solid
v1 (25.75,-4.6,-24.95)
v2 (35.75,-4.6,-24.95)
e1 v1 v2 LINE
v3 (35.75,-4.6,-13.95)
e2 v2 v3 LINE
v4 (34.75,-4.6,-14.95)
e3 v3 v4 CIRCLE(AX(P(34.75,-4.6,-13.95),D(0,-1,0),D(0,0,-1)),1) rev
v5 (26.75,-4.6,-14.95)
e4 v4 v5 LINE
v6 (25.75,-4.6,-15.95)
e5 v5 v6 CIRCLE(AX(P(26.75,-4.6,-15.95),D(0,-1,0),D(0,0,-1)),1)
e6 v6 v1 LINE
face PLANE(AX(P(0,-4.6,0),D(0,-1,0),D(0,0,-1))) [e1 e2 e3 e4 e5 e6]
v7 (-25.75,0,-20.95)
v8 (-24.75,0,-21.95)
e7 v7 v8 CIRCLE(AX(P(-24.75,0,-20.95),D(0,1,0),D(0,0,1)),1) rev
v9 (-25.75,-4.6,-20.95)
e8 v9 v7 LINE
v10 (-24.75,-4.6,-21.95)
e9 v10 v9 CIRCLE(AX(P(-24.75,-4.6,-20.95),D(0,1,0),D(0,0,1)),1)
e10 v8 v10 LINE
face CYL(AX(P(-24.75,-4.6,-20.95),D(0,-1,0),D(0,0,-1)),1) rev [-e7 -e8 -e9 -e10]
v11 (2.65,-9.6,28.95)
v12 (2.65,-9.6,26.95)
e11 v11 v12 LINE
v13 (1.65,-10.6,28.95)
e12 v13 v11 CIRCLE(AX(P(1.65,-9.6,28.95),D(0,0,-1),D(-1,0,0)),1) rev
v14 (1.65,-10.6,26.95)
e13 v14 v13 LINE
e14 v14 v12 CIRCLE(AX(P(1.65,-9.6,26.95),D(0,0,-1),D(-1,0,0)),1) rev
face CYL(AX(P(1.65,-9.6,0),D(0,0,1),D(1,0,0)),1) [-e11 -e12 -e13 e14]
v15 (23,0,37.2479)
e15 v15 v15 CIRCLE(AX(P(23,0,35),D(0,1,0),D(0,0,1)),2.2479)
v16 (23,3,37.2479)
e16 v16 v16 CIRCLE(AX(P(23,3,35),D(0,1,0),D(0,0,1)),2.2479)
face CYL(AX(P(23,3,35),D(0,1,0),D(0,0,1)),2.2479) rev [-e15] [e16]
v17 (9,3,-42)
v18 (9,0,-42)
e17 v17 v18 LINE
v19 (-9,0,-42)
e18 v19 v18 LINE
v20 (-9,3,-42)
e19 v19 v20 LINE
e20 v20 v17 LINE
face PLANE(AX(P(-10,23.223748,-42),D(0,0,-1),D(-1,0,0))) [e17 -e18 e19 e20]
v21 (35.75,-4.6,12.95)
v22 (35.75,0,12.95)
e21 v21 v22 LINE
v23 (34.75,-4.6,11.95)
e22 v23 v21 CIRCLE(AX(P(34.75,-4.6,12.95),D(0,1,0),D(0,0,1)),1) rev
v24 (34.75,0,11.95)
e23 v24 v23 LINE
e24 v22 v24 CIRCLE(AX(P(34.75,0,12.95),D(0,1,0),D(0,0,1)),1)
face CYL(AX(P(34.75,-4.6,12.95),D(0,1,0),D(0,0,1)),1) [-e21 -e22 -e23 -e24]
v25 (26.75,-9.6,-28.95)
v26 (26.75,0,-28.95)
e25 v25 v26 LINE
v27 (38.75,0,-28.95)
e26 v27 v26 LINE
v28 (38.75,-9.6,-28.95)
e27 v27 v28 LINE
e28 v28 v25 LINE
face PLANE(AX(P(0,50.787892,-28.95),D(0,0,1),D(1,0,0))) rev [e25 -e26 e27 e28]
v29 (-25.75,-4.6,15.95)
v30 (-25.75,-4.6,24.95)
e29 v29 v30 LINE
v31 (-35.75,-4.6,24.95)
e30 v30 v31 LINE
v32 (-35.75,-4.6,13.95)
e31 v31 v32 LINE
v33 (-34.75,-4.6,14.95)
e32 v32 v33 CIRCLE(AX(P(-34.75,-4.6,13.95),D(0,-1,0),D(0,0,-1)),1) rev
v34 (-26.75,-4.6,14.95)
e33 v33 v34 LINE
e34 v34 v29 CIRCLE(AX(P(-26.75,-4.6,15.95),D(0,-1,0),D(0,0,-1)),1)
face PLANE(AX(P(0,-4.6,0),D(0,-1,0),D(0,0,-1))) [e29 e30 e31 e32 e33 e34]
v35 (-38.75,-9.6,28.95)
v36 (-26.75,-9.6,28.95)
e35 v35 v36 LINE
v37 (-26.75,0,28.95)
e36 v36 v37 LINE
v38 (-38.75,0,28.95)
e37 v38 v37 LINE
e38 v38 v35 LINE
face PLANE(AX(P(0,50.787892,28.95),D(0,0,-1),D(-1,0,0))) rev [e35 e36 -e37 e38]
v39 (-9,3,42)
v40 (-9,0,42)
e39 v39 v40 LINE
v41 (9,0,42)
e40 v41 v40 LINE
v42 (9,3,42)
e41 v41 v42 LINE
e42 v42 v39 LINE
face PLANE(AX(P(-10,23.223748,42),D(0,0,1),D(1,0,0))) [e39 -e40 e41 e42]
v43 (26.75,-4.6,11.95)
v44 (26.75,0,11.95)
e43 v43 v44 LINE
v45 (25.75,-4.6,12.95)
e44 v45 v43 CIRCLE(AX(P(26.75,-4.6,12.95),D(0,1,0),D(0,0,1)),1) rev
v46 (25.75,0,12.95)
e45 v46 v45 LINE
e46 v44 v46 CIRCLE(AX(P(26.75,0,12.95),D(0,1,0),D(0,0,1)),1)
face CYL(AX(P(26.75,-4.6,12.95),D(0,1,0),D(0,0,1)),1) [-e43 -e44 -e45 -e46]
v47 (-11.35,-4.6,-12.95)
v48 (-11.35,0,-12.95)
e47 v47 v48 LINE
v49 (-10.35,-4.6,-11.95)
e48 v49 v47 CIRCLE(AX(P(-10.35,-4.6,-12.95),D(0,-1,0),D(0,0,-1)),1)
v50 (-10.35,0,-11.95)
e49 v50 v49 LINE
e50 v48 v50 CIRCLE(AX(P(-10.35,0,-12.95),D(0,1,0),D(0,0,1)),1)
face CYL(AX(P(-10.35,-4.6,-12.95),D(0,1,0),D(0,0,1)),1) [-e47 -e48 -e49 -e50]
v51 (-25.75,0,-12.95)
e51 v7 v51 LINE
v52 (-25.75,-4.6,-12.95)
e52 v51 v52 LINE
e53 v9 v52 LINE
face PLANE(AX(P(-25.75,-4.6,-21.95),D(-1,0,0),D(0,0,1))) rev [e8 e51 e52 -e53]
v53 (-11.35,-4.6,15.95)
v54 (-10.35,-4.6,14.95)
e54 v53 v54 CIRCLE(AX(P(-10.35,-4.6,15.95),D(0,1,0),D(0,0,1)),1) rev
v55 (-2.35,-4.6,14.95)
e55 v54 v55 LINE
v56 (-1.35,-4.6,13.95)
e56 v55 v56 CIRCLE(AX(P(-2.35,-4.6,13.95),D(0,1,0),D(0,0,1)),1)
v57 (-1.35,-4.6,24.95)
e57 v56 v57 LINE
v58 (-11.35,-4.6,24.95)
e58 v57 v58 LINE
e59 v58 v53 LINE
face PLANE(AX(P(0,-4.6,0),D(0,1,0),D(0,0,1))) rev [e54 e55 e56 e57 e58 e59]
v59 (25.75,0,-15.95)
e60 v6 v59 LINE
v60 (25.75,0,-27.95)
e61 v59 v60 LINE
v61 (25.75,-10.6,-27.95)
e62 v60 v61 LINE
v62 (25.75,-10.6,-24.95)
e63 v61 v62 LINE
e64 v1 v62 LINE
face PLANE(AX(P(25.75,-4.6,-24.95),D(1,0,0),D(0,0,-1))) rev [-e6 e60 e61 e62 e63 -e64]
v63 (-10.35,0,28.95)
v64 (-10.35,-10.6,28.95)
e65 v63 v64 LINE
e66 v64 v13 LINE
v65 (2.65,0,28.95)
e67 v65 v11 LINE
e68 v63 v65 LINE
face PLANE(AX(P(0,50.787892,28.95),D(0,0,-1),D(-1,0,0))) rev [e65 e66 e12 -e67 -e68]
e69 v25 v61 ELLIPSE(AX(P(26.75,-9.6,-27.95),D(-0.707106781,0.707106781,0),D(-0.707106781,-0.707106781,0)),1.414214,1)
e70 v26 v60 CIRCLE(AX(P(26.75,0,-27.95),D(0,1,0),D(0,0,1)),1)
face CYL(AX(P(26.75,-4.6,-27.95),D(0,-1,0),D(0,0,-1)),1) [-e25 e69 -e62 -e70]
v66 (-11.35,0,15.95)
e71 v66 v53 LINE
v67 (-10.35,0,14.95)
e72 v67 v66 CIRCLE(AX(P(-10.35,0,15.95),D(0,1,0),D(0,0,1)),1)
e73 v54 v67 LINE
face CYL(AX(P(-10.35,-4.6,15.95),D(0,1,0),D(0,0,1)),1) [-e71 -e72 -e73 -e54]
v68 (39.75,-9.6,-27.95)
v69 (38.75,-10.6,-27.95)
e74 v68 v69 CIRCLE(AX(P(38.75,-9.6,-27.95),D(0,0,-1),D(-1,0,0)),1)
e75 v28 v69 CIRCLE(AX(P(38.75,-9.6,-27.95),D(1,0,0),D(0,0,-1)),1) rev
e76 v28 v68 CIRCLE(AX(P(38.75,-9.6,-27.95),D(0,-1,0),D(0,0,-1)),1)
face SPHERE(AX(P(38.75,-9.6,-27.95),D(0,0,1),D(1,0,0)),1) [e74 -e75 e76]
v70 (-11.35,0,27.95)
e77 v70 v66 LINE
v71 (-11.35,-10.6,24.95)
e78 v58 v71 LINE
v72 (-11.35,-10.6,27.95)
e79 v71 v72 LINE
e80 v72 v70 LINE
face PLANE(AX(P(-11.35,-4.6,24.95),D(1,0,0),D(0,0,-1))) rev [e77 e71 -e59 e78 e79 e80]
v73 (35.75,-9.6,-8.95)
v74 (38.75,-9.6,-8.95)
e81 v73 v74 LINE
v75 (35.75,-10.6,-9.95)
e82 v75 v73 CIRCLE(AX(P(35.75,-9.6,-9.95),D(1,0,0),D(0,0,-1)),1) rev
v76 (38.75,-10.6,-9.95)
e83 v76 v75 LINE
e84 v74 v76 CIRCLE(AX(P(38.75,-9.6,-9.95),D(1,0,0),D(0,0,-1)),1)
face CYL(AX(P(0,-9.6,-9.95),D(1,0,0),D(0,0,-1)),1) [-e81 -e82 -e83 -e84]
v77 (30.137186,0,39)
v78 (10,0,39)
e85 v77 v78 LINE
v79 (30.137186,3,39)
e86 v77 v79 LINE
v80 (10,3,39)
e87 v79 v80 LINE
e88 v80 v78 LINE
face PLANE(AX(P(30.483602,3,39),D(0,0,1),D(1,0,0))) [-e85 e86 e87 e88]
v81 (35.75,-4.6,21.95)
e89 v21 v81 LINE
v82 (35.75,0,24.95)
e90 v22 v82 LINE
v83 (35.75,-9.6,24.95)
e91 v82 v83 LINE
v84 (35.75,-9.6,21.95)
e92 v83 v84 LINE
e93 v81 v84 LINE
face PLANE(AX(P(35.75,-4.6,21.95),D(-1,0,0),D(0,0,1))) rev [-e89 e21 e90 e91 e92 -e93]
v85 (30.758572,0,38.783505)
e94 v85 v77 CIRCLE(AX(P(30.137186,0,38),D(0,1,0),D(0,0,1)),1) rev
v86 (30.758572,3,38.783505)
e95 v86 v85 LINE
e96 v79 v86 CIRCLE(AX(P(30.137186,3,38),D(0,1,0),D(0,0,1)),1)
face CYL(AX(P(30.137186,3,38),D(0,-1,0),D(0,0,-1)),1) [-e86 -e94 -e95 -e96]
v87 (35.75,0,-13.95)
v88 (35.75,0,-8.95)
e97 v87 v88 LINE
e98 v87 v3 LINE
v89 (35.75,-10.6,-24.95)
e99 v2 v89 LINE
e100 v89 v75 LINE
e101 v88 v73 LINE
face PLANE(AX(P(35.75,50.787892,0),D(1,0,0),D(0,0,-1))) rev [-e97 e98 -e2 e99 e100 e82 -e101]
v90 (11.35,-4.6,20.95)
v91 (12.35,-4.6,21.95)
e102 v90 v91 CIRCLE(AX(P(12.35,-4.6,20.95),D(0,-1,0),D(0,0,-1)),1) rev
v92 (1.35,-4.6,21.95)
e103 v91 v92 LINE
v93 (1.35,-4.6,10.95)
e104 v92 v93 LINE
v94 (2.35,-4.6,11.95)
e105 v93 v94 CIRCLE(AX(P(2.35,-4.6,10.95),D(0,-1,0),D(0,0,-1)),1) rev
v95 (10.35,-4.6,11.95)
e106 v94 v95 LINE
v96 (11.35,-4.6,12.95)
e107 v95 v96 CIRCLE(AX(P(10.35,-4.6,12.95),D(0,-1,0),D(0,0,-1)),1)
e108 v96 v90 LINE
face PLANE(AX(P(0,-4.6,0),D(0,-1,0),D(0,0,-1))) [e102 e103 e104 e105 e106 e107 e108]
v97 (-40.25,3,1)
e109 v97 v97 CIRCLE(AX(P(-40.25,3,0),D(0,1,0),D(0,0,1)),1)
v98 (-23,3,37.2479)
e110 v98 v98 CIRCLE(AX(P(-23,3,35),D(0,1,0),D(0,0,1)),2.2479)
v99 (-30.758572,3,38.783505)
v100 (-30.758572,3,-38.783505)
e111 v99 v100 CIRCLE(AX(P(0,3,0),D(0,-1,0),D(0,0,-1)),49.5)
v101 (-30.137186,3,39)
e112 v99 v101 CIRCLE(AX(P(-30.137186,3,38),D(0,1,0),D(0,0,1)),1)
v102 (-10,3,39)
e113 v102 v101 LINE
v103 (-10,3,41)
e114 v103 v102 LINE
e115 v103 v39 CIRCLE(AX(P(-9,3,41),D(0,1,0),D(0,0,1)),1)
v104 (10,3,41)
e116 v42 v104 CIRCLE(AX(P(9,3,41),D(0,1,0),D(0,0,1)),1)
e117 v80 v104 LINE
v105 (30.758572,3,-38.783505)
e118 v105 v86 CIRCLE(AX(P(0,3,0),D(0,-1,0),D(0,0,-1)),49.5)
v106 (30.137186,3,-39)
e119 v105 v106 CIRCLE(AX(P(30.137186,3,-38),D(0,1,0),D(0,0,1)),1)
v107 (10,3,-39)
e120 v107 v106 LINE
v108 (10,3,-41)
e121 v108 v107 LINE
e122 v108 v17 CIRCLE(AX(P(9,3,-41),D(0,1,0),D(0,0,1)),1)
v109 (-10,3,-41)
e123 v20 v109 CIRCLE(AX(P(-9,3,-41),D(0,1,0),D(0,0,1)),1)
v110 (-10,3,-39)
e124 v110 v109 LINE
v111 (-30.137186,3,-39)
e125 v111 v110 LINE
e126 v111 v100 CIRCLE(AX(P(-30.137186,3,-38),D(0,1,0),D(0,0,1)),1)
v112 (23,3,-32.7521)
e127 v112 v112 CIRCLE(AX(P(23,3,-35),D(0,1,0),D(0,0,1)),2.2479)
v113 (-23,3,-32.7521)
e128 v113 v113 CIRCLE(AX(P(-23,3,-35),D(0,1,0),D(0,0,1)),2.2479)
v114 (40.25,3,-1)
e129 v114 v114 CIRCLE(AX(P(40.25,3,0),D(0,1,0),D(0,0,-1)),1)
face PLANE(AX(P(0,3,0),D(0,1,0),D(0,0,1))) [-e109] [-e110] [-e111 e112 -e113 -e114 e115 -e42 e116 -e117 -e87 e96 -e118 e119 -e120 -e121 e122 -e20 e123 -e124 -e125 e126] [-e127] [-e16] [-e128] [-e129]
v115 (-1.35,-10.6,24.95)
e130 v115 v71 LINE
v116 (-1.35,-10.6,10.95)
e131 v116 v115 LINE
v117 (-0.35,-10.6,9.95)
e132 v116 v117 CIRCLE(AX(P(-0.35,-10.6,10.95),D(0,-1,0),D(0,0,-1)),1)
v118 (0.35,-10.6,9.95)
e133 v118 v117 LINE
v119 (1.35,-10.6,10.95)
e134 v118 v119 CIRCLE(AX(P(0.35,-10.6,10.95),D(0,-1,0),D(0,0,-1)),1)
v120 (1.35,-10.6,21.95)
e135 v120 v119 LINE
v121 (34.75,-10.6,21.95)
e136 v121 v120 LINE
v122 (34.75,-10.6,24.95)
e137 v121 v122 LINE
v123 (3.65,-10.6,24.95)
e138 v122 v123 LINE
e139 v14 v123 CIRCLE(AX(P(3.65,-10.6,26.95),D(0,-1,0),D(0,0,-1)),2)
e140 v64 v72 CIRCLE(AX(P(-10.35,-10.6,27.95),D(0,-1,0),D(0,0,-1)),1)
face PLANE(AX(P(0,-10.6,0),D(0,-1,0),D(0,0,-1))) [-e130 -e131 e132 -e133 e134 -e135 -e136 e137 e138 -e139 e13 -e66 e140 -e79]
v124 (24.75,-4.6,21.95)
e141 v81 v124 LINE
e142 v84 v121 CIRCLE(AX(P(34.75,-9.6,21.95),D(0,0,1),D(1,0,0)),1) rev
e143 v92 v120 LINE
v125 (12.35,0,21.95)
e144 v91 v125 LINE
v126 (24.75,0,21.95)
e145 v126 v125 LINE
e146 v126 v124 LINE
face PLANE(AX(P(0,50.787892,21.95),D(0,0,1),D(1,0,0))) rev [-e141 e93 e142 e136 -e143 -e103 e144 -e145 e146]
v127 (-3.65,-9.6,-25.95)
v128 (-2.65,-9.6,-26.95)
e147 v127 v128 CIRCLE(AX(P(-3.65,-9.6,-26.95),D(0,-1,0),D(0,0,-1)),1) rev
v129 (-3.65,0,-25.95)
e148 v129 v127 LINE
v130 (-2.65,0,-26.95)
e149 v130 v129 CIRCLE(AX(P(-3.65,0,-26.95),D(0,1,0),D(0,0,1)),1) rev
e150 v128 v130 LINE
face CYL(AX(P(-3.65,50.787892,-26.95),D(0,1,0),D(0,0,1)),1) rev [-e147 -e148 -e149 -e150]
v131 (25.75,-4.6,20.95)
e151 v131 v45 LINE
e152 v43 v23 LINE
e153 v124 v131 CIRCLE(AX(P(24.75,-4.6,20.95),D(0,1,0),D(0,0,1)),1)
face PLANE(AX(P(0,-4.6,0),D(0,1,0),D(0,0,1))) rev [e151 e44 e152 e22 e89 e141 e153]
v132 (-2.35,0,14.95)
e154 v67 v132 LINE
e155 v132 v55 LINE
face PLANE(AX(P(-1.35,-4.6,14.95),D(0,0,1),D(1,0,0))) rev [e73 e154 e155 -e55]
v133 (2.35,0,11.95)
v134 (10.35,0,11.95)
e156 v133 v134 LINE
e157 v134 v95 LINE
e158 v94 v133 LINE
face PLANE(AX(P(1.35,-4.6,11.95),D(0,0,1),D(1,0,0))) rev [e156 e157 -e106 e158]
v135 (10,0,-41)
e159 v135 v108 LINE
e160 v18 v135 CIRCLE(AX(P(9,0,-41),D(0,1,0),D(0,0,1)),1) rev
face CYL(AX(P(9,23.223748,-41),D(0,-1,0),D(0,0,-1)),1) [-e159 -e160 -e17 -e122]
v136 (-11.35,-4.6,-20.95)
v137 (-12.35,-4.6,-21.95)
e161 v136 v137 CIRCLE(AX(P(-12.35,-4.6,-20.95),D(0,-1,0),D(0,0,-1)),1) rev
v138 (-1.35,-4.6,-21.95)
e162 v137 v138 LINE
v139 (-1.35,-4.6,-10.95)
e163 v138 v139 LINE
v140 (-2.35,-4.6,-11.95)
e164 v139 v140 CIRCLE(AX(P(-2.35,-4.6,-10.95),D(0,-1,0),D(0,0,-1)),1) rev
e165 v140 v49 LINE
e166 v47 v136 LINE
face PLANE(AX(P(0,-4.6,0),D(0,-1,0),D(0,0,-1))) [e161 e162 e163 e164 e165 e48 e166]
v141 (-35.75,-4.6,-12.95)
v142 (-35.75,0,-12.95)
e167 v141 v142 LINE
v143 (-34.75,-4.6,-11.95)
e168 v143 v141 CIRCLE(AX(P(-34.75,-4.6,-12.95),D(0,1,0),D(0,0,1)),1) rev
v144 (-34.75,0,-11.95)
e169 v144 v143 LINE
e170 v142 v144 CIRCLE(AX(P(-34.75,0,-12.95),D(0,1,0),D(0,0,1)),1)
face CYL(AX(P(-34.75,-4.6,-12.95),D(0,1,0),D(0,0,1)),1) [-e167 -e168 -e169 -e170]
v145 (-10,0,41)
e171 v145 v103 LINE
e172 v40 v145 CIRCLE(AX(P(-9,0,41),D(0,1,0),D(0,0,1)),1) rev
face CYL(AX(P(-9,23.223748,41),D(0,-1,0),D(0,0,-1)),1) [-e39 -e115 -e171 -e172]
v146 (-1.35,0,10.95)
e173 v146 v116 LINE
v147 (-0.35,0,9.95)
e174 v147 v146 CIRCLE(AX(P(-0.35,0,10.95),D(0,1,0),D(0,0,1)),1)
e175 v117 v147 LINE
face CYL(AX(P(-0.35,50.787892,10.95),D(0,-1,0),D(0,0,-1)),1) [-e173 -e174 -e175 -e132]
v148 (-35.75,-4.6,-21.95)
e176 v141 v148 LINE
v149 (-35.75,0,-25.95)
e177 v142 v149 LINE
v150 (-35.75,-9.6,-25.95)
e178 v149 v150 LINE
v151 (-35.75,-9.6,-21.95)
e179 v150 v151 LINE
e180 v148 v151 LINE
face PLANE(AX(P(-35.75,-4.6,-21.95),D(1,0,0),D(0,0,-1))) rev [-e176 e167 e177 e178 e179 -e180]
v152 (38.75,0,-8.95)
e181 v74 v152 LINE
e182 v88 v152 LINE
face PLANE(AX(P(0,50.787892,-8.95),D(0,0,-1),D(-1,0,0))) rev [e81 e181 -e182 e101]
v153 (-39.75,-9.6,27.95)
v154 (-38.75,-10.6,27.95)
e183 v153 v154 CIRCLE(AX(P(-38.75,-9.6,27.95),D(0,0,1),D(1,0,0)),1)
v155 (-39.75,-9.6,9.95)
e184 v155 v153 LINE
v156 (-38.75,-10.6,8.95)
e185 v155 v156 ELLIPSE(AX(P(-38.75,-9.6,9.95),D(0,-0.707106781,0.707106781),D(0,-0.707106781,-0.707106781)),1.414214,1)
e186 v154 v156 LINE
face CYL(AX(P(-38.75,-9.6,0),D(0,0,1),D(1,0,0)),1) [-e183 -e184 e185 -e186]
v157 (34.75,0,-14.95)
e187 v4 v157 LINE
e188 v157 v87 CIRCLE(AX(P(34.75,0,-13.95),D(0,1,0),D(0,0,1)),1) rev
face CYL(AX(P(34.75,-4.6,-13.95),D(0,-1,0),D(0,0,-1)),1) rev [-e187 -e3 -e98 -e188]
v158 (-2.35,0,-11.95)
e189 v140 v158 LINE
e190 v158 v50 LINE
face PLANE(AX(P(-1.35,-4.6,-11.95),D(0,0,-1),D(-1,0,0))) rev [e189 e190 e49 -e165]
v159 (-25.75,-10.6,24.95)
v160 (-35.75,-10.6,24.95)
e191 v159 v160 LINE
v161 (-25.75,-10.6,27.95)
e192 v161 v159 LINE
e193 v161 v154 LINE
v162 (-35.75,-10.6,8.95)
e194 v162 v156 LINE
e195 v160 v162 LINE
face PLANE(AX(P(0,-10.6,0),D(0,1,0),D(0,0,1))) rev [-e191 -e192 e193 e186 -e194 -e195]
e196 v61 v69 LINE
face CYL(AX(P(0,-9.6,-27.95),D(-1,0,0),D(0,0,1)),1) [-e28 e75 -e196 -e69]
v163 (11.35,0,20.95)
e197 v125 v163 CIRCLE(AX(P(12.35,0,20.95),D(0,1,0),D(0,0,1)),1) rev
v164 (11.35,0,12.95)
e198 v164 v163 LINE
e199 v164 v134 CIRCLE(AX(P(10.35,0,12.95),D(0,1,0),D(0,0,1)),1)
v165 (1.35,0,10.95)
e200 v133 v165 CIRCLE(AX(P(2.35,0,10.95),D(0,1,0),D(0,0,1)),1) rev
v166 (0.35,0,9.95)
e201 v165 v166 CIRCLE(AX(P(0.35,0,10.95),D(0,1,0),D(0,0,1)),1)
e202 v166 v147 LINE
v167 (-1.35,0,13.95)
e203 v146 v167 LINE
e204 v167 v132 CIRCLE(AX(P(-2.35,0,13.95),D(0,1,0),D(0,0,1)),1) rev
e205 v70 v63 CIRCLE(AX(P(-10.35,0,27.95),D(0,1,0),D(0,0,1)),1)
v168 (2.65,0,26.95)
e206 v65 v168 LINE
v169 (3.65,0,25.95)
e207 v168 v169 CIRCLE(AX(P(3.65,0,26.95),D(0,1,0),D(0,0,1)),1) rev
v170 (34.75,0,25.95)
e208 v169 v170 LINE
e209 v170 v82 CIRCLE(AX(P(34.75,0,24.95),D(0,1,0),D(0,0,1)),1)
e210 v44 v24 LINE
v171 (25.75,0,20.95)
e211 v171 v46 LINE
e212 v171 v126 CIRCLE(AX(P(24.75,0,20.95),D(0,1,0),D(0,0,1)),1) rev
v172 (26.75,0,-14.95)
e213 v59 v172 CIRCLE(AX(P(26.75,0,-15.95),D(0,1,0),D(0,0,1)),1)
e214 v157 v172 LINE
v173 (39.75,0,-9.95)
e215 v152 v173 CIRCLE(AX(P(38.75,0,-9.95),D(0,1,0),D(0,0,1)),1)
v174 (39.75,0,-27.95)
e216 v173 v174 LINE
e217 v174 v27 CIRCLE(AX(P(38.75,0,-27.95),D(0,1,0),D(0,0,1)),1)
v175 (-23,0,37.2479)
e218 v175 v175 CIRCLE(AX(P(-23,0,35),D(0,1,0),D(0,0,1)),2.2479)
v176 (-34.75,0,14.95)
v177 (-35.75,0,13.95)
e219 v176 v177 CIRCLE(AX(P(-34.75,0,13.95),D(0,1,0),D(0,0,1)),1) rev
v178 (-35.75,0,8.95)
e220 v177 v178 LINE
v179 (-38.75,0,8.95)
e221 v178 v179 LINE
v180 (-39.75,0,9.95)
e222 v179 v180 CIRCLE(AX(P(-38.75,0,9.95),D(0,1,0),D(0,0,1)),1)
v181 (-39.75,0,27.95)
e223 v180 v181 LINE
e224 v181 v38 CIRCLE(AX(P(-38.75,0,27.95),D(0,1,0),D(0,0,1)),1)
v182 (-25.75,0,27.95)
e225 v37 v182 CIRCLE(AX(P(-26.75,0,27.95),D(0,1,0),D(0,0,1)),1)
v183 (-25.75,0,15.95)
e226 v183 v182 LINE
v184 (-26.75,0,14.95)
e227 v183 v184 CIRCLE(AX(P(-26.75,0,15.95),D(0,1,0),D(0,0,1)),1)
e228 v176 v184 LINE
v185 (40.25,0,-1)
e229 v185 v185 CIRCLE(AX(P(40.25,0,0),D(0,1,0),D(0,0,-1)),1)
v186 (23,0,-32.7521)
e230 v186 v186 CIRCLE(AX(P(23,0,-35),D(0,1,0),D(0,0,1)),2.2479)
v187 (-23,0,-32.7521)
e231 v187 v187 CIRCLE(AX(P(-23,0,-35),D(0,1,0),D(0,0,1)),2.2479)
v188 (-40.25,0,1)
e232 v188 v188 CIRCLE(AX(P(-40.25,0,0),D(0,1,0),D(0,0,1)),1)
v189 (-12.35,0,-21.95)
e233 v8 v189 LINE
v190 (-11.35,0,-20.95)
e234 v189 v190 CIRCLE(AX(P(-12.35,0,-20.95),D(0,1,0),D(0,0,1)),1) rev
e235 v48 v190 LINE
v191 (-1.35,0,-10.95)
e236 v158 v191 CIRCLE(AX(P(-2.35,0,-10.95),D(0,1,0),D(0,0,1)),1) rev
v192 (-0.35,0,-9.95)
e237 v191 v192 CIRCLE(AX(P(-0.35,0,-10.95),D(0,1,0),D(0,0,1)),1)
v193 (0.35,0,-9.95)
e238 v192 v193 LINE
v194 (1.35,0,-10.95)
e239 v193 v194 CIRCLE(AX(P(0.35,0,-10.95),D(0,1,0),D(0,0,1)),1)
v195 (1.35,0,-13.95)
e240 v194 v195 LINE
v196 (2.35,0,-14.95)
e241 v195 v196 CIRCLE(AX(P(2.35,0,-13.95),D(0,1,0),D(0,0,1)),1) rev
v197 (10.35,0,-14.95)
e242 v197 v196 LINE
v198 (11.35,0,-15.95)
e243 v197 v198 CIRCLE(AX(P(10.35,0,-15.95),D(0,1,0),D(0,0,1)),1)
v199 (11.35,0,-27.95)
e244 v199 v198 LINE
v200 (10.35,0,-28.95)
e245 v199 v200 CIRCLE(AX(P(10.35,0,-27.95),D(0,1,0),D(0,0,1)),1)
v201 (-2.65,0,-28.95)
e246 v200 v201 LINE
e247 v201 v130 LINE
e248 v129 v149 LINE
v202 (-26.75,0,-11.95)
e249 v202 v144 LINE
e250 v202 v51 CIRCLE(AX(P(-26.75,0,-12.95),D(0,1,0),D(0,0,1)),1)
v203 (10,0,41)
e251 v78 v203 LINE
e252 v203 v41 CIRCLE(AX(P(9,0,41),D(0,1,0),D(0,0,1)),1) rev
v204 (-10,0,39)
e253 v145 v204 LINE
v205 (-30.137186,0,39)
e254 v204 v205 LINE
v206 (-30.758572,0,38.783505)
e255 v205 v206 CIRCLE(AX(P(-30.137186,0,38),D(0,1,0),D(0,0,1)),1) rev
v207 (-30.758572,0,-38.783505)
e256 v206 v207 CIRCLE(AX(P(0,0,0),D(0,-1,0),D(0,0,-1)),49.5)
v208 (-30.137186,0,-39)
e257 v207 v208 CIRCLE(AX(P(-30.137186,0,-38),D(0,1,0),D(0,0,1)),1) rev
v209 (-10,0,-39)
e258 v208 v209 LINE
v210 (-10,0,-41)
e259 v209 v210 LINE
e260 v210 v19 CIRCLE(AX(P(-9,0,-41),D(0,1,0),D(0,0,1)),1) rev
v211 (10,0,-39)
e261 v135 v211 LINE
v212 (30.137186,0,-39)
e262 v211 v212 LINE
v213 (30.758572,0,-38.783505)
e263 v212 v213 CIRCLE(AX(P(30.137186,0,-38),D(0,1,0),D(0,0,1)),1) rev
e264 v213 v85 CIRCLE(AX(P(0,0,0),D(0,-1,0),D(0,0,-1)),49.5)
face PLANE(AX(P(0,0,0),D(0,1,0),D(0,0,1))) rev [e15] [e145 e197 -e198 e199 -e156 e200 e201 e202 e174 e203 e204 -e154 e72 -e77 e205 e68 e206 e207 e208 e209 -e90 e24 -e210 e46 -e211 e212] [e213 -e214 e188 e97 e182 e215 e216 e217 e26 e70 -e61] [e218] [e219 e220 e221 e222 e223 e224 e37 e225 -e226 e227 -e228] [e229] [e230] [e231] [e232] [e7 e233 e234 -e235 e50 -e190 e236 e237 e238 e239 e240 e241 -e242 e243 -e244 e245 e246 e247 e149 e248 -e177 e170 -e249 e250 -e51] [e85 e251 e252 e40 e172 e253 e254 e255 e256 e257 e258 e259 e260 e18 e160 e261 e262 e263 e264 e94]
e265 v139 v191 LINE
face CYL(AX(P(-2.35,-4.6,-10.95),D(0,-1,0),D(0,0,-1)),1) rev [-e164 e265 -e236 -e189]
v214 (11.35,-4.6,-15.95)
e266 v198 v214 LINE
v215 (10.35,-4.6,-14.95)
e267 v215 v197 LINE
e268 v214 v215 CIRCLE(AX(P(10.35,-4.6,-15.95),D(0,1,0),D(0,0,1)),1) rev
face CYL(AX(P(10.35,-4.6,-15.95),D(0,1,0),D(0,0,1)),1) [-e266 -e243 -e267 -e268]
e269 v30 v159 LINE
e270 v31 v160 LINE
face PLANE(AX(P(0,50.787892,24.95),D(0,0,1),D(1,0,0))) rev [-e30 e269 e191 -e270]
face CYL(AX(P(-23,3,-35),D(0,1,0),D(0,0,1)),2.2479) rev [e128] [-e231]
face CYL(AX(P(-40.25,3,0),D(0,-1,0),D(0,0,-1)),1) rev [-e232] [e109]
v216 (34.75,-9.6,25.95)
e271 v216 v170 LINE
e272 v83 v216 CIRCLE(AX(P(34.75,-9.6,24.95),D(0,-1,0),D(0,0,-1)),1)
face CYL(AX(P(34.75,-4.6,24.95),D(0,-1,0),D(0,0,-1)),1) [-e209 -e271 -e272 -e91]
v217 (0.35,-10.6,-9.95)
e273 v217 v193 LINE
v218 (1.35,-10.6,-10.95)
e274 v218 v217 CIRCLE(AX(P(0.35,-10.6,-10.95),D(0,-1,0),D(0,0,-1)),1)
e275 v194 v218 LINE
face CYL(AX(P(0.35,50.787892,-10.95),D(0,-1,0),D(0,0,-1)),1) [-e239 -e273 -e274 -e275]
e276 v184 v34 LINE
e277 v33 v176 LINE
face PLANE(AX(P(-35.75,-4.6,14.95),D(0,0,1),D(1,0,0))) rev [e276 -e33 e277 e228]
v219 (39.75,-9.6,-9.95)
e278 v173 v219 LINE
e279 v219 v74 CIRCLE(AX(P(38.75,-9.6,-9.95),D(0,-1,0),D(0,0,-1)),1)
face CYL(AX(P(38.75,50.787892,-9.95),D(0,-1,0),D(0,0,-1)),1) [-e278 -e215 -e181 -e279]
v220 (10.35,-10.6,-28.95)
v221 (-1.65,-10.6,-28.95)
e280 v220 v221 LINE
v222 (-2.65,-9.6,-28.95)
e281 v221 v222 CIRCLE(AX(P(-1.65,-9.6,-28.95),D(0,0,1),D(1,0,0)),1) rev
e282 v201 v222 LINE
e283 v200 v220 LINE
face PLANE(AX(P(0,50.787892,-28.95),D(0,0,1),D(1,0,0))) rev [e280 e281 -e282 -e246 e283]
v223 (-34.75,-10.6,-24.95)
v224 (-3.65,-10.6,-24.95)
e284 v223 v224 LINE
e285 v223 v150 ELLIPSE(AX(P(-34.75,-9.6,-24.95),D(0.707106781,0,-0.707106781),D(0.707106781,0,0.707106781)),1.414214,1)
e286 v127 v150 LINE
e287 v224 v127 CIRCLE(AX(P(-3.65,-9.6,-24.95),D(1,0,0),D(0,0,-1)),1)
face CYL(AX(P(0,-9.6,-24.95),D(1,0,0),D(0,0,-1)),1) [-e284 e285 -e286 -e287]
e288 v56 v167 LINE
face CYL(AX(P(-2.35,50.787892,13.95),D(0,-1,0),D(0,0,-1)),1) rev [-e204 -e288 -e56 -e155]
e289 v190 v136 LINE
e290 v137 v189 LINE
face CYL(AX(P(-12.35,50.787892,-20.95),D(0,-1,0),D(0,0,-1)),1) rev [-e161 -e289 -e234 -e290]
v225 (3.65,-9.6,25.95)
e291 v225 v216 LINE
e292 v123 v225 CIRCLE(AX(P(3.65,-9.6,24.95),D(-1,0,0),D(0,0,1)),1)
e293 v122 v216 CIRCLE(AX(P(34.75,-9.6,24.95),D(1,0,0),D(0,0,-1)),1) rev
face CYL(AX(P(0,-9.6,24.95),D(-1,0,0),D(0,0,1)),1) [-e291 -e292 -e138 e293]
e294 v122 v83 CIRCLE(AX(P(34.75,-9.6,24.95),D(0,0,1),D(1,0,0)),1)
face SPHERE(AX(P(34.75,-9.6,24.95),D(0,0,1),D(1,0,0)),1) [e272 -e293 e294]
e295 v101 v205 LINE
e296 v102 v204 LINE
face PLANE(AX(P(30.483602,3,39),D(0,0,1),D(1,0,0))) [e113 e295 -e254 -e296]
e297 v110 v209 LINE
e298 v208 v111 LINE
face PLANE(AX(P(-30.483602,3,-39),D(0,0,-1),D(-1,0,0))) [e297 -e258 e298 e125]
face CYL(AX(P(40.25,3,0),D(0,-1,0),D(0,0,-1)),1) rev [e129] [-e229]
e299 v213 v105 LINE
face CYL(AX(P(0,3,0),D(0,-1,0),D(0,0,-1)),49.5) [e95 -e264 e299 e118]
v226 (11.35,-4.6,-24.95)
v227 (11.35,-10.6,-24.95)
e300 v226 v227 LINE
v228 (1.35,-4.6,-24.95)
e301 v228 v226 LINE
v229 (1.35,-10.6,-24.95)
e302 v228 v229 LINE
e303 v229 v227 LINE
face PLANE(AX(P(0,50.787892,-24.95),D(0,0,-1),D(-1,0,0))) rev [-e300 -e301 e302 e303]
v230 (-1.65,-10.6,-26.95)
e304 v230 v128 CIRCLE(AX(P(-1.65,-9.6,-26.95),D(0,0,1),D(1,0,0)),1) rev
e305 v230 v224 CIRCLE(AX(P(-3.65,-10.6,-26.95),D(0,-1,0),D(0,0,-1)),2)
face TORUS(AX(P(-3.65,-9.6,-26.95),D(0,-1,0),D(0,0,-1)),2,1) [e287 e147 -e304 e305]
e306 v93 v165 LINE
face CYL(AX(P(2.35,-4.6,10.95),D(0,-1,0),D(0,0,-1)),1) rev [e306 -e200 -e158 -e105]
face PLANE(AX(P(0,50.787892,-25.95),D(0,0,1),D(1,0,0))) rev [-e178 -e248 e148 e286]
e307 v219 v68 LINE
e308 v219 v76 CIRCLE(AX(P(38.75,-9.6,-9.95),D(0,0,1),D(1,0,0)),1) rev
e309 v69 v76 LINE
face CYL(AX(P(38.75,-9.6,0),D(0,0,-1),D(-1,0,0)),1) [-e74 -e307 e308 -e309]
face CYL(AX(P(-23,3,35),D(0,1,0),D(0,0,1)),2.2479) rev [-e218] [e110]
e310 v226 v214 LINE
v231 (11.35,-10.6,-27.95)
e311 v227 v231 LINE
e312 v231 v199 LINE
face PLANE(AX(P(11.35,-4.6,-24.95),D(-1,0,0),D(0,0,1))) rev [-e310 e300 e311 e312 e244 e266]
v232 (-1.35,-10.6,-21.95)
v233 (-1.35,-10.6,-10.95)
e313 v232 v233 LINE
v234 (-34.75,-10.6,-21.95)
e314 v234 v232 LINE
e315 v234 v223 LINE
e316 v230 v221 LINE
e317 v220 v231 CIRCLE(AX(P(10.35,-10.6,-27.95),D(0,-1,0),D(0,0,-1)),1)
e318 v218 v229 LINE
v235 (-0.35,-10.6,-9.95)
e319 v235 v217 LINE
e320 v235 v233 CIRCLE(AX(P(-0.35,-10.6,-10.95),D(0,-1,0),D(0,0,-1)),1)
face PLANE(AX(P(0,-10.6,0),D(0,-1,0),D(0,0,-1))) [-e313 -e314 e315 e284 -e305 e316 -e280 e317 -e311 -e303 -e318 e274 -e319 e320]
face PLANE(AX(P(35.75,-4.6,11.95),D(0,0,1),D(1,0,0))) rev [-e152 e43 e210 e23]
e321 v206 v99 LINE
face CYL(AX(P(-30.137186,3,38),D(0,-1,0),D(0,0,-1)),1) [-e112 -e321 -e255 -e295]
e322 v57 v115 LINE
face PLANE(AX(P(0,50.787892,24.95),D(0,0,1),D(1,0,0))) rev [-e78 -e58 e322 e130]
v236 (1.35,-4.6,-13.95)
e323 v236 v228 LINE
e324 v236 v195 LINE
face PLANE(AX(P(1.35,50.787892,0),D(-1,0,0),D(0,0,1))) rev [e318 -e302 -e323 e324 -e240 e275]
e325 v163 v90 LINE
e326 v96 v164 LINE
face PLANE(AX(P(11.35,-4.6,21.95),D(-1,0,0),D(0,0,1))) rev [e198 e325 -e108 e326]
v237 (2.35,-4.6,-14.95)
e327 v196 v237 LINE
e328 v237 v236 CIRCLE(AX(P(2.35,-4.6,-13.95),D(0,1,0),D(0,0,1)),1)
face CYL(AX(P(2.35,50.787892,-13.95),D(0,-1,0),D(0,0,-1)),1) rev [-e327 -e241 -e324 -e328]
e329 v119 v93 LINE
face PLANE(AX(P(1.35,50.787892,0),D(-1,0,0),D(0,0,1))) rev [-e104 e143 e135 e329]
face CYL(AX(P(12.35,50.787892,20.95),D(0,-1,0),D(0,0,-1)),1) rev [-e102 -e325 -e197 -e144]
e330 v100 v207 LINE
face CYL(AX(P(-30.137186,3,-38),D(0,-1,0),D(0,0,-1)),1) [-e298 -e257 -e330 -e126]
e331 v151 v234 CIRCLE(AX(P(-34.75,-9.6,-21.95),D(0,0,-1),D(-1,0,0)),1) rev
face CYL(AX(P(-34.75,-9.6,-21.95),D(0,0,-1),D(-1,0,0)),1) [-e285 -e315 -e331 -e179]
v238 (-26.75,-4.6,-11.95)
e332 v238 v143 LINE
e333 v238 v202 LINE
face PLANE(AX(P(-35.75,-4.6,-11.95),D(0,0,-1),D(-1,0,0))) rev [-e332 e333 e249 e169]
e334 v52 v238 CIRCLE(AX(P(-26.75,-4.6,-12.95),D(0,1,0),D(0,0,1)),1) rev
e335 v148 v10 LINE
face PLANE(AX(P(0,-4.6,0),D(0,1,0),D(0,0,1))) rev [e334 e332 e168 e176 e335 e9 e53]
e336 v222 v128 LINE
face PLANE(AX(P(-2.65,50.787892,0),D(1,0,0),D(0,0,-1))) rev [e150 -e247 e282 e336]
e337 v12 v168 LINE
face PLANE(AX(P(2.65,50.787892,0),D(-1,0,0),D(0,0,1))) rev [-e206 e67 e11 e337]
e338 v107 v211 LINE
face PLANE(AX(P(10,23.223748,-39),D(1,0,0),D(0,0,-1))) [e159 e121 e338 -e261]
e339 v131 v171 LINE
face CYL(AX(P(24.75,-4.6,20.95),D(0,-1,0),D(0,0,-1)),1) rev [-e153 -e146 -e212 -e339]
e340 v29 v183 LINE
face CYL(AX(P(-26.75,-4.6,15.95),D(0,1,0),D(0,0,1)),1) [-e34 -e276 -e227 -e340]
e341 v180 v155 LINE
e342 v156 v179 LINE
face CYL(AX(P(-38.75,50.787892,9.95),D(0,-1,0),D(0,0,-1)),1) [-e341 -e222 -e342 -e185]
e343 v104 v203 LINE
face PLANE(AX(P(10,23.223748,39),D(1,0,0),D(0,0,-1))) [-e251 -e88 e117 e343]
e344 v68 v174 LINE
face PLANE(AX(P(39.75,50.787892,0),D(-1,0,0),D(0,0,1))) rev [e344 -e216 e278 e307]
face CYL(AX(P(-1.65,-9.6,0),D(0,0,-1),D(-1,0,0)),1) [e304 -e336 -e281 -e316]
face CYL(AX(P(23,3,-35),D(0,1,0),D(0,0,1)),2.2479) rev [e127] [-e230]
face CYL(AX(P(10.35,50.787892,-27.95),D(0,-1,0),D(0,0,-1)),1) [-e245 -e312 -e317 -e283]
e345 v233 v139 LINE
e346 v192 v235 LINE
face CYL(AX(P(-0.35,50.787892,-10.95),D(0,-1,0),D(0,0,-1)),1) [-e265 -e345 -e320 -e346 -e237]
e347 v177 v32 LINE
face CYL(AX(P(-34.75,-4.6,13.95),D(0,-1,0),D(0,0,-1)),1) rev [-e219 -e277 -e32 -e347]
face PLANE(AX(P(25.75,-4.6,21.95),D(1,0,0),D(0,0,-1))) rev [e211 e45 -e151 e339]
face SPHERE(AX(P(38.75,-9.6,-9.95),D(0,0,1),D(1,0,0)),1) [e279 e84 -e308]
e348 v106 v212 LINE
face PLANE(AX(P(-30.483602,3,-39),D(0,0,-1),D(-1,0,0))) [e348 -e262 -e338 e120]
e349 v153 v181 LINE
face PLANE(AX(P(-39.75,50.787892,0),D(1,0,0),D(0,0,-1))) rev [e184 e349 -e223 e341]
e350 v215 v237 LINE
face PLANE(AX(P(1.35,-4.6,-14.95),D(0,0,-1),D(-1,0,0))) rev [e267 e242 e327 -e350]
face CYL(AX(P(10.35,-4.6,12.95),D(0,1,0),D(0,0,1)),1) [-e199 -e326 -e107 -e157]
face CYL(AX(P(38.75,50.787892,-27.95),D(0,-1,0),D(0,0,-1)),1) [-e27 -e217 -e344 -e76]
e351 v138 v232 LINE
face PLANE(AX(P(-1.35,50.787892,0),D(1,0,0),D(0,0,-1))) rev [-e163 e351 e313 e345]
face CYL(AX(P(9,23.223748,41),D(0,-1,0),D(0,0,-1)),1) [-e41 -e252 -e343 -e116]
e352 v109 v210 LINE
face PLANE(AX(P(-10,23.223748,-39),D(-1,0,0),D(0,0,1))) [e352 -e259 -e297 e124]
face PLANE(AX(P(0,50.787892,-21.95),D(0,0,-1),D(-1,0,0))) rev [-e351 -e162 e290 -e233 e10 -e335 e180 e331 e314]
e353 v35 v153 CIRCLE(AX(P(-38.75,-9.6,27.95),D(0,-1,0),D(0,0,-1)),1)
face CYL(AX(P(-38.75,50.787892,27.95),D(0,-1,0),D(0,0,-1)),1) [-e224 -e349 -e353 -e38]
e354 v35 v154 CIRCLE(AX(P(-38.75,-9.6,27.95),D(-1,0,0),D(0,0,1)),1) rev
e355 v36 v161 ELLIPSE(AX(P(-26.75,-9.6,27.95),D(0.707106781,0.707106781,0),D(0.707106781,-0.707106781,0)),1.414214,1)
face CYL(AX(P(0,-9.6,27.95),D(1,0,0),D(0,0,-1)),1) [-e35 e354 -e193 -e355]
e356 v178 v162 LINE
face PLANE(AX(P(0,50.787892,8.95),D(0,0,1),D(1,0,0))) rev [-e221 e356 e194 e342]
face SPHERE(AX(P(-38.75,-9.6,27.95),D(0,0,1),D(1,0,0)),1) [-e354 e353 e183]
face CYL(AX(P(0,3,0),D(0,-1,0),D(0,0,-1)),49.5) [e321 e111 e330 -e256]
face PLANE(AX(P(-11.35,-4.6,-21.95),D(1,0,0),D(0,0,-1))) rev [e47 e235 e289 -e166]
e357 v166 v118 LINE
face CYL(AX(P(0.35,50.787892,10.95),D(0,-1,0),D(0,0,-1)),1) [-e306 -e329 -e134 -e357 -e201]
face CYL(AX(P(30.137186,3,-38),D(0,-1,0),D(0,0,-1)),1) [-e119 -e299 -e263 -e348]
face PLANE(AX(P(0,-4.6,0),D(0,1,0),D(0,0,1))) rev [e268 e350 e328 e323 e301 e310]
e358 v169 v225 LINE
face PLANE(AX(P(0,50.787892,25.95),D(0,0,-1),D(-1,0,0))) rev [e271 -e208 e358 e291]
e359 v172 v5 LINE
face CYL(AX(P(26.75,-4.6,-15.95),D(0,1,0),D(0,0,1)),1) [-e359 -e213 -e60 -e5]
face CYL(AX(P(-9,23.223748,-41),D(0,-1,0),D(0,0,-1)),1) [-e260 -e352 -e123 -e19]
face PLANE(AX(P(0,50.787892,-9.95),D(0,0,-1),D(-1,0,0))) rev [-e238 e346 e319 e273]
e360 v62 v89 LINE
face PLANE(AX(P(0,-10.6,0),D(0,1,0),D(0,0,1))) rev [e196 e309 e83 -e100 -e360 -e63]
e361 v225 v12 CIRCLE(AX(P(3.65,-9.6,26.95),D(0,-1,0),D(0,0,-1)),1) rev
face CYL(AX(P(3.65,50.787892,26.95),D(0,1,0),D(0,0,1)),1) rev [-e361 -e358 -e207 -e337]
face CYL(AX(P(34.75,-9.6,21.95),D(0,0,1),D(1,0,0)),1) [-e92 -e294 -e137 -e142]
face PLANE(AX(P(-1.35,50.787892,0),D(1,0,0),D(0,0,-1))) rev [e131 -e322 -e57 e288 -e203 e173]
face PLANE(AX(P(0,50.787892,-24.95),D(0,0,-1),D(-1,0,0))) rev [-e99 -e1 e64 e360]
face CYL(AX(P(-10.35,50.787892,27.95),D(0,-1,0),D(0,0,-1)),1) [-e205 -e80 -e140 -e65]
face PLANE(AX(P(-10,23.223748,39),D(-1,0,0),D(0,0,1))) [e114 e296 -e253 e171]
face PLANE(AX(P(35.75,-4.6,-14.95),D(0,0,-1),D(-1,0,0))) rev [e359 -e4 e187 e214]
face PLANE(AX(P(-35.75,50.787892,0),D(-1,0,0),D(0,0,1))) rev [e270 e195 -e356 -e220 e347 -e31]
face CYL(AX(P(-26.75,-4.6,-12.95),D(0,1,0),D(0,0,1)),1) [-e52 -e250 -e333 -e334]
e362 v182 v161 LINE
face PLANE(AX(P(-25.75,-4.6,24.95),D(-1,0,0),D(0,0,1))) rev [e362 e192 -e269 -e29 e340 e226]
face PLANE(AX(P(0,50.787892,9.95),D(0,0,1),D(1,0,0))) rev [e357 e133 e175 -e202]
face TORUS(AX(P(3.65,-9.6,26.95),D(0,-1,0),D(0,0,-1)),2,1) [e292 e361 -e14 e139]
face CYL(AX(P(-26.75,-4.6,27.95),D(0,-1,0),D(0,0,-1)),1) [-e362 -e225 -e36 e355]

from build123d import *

# Parameters (mm, degrees)
A_BASE_T42_OUTLINE_R       = 2.2479
A_BASE_T42_OUTLINE_R_2     = 1
A_BASE_T42_DEPTH           = 3
OUTER_RIM_CUT_DEPTH        = 68.299702823
SKETCH2_W                  = 20
SKETCH2_H                  = 3
FLANGES_DEPTH              = 3
CONTOURING_R               = 1
SKETCH3_W                  = 15
SKETCH3_H                  = 3
BASE_SUPPORTS_DEPTH        = 3
BASE_SUPPORTS_CHAMFER_SIZE = 3
SKETCH10_W                 = 15
SKETCH10_H                 = 6
CUT_EXTRUDE1_DEPTH         = 10
SKETCH9_W                  = 10
SKETCH9_H                  = 10
BOSS_EXTRUDE1_DEPTH        = 4.6
BOSS_EXTRUDE2_DEPTH        = 10.6
FILLET1_R                  = 1


# Read off the part's stored shape, not the designer's step: a_base_t42
with BuildPart() as part:
    # a_base_t42 outline → a_base_t42 (new body)
    with BuildSketch(Plane(origin=(0, 0, 0), x_dir=(1, 0, 0), z_dir=(0, 1, 0))):
        with BuildLine():
            ThreePointArc((31.5, -42), (52.5, 0), (31.5, 42))
            Line((31.5, 42), (-31.5, 42))
            ThreePointArc((-31.5, 42), (-52.5, 0), (-31.5, -42))
            Line((-31.5, -42), (31.5, -42))
        make_face()
        with Locations((-23, -35)):
            Circle(A_BASE_T42_OUTLINE_R, mode=Mode.SUBTRACT)
        with Locations((23, -35)):
            Circle(A_BASE_T42_OUTLINE_R, mode=Mode.SUBTRACT)
        with Locations((-40.25, 0)):
            Circle(A_BASE_T42_OUTLINE_R_2, mode=Mode.SUBTRACT)
        with Locations((-23, 35)):
            Circle(A_BASE_T42_OUTLINE_R, mode=Mode.SUBTRACT)
        with Locations((40.25, 0)):
            Circle(A_BASE_T42_OUTLINE_R_2, mode=Mode.SUBTRACT)
        with Locations((23, 35)):
            Circle(A_BASE_T42_OUTLINE_R, mode=Mode.SUBTRACT)
    extrude(amount=A_BASE_T42_DEPTH)

    # Sketch1 → Outer Rim Cut (cut, through all)
    with BuildSketch(Plane.XZ):
        with BuildLine():
            Line((31.5, 42), (-31.5, 42))
            ThreePointArc((-31.5, 42), (-52.5, 0), (-31.5, -42))
            Line((-31.5, -42), (31.5, -42))
            ThreePointArc((31.5, -42), (52.5, 0), (31.5, 42))
        make_face()
        with BuildLine():
            Line((30.483602149, 39), (-30.483602149, 39))
            ThreePointArc((-30.483602149, 39), (-49.5, 0), (-30.483602149, -39))
            Line((-30.483602149, -39), (30.483602149, -39))
            ThreePointArc((30.483602149, -39), (49.5, 0), (30.483602149, 39))
        make_face(mode=Mode.SUBTRACT)
    extrude(amount=-OUTER_RIM_CUT_DEPTH, mode=Mode.SUBTRACT)

    # Sketch2 → Flanges (add)
    with BuildSketch(Plane.XZ):
        with Locations((0, -40.5)):
            Rectangle(SKETCH2_W, SKETCH2_H)
        with Locations((0, 40.5)):
            Rectangle(SKETCH2_W, SKETCH2_H)
    extrude(amount=-FLANGES_DEPTH)

    # Contouring
    contouring_edges = [part.edges().sort_by_distance(p)[0] for p in [
        (30.483602149, 1.5, -39),
        (-30.483602149, 1.5, -39),
        (10, 1.5, -42),
        (-10, 1.5, -42),
        (30.483602149, 1.5, 39),
        (-30.483602149, 1.5, 39),
        (10, 1.5, 42),
        (-10, 1.5, 42),
    ]]
    fillet(contouring_edges, radius=CONTOURING_R)

    # Sketch3 → Base Supports (add)
    with BuildSketch(Plane.XZ):
        with Locations((0, -27)):
            Rectangle(SKETCH3_W, SKETCH3_H)
        with Locations((0, 27)):
            Rectangle(SKETCH3_W, SKETCH3_H)
    extrude(amount=BASE_SUPPORTS_DEPTH)

    # Base Supports Chamfer
    base_supports_chamfer_edges = [part.edges().sort_by_distance(p)[0] for p in [
        (0, 0, 28.5),
        (0, 0, -28.5),
    ]]
    chamfer(base_supports_chamfer_edges, length=BASE_SUPPORTS_CHAMFER_SIZE - 0.0001)  # a hair under: the kernel refuses the full size

    # Sketch10 → Cut-Extrude1 (cut)
    with BuildSketch(Plane.XZ):
        with Locations((0, 28.5)):
            Rectangle(SKETCH10_W, SKETCH10_H)
        with Locations((0, -28.5)):
            Rectangle(SKETCH10_W, SKETCH10_H)
    extrude(amount=CUT_EXTRUDE1_DEPTH, mode=Mode.SUBTRACT)

    # Sketch9 → Boss-Extrude1 (add)
    with BuildSketch(Plane.XZ):
        with Locations((6.35, 16.95)):
            Rectangle(SKETCH9_W, SKETCH9_H)
        with Locations((30.75, 16.95)):
            Rectangle(SKETCH9_W, SKETCH9_H)
        with Locations((30.75, -19.95)):
            Rectangle(SKETCH9_W, SKETCH9_H)
        with Locations((6.35, -19.95)):
            Rectangle(SKETCH9_W, SKETCH9_H)
        with Locations((-6.35, -16.95)):
            Rectangle(SKETCH9_W, SKETCH9_H)
        with Locations((-6.35, 19.95)):
            Rectangle(SKETCH9_W, SKETCH9_H)
        with Locations((-30.75, 19.95)):
            Rectangle(SKETCH9_W, SKETCH9_H)
        with Locations((-30.75, -16.95)):
            Rectangle(SKETCH9_W, SKETCH9_H)
    extrude(amount=BOSS_EXTRUDE1_DEPTH)

    # Sketch11 → Boss-Extrude2 (add)
    with BuildSketch(Plane.XZ):
        Polygon((35.75, -24.95), (35.75, -8.95), (39.75, -8.95), (39.75, -28.95), (25.75, -28.95), (25.75, -24.95), align=None)
        Polygon((-2.65, -28.95), (-2.65, -25.95), (-35.75, -25.95), (-35.75, -21.95), (-1.35, -21.95), (-1.35, -9.95), (1.35, -9.95), (1.35, -24.95), (11.35, -24.95), (11.35, -28.95), align=None)
        Polygon((-1.35, 24.95), (-11.35, 24.95), (-11.35, 28.95), (2.65, 28.95), (2.65, 25.95), (35.75, 25.95), (35.75, 21.95), (1.35, 21.95), (1.35, 9.95), (-1.35, 9.95), align=None)
        Polygon((-35.75, 24.95), (-35.75, 8.95), (-39.75, 8.95), (-39.75, 28.95), (-25.75, 28.95), (-25.75, 24.95), align=None)
    extrude(amount=BOSS_EXTRUDE2_DEPTH)

    # Fillet1
    fillet1_edges = [part.edges().sort_by_distance(p)[0] for p in [
        (2.65, -10.6, 27.45),
        (-2.65, -10.6, -27.45),
        (2.65, -5.3, 25.95),
        (-39.75, -5.3, 28.95),
        (-39.75, -5.3, 8.95),
        (-1.35, -2.3, 14.95),
        (-11.35, -2.3, 14.95),
        (-25.75, -2.3, 14.95),
        (-35.75, -2.3, 14.95),
        (-1.35, -2.3, -11.95),
        (-11.35, -2.3, -21.95),
        (-11.35, -2.3, -11.95),
        (-25.75, -2.3, -21.95),
        (35.75, -2.3, 11.95),
        (-35.75, -2.3, -11.95),
        (-25.75, -2.3, -11.95),
        (-35.75, -10.6, -23.95),
        (39.75, -10.6, -18.95),
        (37.75, -10.6, -8.95),
        (35.75, -10.6, 23.95),
        (19.2, -10.6, 25.95),
        (35.75, -5.3, 25.95),
        (25.75, -2.3, 11.95),
        (25.75, -2.3, 21.95),
        (11.35, -2.3, 21.95),
        (1.35, -2.3, 11.95),
        (11.35, -2.3, 11.95),
        (-1.35, -5.3, 9.95),
        (1.35, -5.3, 9.95),
        (1.35, -5.3, -9.95),
        (-1.35, -5.3, -9.95),
        (1.35, -2.3, -14.95),
        (11.35, -2.3, -14.95),
        (25.75, -2.3, -14.95),
        (35.75, -2.3, -14.95),
        (39.75, -5.3, -8.95),
        (39.75, -5.3, -28.95),
        (32.75, -10.6, -28.95),
        (-2.65, -5.3, -25.95),
        (-19.2, -10.6, -25.95),
        (-39.75, -10.6, 18.95),
        (-32.75, -10.6, 28.95),
        (-11.35, -5.3, 28.95),
        (-25.75, -5.3, 28.95),
        (11.35, -5.3, -28.95),
        (25.75, -5.3, -28.95),
    ]]
    fillet(fillet1_edges, radius=FILLET1_R - 0.0001)  # a hair under: the kernel refuses the full size


solid = part.part
